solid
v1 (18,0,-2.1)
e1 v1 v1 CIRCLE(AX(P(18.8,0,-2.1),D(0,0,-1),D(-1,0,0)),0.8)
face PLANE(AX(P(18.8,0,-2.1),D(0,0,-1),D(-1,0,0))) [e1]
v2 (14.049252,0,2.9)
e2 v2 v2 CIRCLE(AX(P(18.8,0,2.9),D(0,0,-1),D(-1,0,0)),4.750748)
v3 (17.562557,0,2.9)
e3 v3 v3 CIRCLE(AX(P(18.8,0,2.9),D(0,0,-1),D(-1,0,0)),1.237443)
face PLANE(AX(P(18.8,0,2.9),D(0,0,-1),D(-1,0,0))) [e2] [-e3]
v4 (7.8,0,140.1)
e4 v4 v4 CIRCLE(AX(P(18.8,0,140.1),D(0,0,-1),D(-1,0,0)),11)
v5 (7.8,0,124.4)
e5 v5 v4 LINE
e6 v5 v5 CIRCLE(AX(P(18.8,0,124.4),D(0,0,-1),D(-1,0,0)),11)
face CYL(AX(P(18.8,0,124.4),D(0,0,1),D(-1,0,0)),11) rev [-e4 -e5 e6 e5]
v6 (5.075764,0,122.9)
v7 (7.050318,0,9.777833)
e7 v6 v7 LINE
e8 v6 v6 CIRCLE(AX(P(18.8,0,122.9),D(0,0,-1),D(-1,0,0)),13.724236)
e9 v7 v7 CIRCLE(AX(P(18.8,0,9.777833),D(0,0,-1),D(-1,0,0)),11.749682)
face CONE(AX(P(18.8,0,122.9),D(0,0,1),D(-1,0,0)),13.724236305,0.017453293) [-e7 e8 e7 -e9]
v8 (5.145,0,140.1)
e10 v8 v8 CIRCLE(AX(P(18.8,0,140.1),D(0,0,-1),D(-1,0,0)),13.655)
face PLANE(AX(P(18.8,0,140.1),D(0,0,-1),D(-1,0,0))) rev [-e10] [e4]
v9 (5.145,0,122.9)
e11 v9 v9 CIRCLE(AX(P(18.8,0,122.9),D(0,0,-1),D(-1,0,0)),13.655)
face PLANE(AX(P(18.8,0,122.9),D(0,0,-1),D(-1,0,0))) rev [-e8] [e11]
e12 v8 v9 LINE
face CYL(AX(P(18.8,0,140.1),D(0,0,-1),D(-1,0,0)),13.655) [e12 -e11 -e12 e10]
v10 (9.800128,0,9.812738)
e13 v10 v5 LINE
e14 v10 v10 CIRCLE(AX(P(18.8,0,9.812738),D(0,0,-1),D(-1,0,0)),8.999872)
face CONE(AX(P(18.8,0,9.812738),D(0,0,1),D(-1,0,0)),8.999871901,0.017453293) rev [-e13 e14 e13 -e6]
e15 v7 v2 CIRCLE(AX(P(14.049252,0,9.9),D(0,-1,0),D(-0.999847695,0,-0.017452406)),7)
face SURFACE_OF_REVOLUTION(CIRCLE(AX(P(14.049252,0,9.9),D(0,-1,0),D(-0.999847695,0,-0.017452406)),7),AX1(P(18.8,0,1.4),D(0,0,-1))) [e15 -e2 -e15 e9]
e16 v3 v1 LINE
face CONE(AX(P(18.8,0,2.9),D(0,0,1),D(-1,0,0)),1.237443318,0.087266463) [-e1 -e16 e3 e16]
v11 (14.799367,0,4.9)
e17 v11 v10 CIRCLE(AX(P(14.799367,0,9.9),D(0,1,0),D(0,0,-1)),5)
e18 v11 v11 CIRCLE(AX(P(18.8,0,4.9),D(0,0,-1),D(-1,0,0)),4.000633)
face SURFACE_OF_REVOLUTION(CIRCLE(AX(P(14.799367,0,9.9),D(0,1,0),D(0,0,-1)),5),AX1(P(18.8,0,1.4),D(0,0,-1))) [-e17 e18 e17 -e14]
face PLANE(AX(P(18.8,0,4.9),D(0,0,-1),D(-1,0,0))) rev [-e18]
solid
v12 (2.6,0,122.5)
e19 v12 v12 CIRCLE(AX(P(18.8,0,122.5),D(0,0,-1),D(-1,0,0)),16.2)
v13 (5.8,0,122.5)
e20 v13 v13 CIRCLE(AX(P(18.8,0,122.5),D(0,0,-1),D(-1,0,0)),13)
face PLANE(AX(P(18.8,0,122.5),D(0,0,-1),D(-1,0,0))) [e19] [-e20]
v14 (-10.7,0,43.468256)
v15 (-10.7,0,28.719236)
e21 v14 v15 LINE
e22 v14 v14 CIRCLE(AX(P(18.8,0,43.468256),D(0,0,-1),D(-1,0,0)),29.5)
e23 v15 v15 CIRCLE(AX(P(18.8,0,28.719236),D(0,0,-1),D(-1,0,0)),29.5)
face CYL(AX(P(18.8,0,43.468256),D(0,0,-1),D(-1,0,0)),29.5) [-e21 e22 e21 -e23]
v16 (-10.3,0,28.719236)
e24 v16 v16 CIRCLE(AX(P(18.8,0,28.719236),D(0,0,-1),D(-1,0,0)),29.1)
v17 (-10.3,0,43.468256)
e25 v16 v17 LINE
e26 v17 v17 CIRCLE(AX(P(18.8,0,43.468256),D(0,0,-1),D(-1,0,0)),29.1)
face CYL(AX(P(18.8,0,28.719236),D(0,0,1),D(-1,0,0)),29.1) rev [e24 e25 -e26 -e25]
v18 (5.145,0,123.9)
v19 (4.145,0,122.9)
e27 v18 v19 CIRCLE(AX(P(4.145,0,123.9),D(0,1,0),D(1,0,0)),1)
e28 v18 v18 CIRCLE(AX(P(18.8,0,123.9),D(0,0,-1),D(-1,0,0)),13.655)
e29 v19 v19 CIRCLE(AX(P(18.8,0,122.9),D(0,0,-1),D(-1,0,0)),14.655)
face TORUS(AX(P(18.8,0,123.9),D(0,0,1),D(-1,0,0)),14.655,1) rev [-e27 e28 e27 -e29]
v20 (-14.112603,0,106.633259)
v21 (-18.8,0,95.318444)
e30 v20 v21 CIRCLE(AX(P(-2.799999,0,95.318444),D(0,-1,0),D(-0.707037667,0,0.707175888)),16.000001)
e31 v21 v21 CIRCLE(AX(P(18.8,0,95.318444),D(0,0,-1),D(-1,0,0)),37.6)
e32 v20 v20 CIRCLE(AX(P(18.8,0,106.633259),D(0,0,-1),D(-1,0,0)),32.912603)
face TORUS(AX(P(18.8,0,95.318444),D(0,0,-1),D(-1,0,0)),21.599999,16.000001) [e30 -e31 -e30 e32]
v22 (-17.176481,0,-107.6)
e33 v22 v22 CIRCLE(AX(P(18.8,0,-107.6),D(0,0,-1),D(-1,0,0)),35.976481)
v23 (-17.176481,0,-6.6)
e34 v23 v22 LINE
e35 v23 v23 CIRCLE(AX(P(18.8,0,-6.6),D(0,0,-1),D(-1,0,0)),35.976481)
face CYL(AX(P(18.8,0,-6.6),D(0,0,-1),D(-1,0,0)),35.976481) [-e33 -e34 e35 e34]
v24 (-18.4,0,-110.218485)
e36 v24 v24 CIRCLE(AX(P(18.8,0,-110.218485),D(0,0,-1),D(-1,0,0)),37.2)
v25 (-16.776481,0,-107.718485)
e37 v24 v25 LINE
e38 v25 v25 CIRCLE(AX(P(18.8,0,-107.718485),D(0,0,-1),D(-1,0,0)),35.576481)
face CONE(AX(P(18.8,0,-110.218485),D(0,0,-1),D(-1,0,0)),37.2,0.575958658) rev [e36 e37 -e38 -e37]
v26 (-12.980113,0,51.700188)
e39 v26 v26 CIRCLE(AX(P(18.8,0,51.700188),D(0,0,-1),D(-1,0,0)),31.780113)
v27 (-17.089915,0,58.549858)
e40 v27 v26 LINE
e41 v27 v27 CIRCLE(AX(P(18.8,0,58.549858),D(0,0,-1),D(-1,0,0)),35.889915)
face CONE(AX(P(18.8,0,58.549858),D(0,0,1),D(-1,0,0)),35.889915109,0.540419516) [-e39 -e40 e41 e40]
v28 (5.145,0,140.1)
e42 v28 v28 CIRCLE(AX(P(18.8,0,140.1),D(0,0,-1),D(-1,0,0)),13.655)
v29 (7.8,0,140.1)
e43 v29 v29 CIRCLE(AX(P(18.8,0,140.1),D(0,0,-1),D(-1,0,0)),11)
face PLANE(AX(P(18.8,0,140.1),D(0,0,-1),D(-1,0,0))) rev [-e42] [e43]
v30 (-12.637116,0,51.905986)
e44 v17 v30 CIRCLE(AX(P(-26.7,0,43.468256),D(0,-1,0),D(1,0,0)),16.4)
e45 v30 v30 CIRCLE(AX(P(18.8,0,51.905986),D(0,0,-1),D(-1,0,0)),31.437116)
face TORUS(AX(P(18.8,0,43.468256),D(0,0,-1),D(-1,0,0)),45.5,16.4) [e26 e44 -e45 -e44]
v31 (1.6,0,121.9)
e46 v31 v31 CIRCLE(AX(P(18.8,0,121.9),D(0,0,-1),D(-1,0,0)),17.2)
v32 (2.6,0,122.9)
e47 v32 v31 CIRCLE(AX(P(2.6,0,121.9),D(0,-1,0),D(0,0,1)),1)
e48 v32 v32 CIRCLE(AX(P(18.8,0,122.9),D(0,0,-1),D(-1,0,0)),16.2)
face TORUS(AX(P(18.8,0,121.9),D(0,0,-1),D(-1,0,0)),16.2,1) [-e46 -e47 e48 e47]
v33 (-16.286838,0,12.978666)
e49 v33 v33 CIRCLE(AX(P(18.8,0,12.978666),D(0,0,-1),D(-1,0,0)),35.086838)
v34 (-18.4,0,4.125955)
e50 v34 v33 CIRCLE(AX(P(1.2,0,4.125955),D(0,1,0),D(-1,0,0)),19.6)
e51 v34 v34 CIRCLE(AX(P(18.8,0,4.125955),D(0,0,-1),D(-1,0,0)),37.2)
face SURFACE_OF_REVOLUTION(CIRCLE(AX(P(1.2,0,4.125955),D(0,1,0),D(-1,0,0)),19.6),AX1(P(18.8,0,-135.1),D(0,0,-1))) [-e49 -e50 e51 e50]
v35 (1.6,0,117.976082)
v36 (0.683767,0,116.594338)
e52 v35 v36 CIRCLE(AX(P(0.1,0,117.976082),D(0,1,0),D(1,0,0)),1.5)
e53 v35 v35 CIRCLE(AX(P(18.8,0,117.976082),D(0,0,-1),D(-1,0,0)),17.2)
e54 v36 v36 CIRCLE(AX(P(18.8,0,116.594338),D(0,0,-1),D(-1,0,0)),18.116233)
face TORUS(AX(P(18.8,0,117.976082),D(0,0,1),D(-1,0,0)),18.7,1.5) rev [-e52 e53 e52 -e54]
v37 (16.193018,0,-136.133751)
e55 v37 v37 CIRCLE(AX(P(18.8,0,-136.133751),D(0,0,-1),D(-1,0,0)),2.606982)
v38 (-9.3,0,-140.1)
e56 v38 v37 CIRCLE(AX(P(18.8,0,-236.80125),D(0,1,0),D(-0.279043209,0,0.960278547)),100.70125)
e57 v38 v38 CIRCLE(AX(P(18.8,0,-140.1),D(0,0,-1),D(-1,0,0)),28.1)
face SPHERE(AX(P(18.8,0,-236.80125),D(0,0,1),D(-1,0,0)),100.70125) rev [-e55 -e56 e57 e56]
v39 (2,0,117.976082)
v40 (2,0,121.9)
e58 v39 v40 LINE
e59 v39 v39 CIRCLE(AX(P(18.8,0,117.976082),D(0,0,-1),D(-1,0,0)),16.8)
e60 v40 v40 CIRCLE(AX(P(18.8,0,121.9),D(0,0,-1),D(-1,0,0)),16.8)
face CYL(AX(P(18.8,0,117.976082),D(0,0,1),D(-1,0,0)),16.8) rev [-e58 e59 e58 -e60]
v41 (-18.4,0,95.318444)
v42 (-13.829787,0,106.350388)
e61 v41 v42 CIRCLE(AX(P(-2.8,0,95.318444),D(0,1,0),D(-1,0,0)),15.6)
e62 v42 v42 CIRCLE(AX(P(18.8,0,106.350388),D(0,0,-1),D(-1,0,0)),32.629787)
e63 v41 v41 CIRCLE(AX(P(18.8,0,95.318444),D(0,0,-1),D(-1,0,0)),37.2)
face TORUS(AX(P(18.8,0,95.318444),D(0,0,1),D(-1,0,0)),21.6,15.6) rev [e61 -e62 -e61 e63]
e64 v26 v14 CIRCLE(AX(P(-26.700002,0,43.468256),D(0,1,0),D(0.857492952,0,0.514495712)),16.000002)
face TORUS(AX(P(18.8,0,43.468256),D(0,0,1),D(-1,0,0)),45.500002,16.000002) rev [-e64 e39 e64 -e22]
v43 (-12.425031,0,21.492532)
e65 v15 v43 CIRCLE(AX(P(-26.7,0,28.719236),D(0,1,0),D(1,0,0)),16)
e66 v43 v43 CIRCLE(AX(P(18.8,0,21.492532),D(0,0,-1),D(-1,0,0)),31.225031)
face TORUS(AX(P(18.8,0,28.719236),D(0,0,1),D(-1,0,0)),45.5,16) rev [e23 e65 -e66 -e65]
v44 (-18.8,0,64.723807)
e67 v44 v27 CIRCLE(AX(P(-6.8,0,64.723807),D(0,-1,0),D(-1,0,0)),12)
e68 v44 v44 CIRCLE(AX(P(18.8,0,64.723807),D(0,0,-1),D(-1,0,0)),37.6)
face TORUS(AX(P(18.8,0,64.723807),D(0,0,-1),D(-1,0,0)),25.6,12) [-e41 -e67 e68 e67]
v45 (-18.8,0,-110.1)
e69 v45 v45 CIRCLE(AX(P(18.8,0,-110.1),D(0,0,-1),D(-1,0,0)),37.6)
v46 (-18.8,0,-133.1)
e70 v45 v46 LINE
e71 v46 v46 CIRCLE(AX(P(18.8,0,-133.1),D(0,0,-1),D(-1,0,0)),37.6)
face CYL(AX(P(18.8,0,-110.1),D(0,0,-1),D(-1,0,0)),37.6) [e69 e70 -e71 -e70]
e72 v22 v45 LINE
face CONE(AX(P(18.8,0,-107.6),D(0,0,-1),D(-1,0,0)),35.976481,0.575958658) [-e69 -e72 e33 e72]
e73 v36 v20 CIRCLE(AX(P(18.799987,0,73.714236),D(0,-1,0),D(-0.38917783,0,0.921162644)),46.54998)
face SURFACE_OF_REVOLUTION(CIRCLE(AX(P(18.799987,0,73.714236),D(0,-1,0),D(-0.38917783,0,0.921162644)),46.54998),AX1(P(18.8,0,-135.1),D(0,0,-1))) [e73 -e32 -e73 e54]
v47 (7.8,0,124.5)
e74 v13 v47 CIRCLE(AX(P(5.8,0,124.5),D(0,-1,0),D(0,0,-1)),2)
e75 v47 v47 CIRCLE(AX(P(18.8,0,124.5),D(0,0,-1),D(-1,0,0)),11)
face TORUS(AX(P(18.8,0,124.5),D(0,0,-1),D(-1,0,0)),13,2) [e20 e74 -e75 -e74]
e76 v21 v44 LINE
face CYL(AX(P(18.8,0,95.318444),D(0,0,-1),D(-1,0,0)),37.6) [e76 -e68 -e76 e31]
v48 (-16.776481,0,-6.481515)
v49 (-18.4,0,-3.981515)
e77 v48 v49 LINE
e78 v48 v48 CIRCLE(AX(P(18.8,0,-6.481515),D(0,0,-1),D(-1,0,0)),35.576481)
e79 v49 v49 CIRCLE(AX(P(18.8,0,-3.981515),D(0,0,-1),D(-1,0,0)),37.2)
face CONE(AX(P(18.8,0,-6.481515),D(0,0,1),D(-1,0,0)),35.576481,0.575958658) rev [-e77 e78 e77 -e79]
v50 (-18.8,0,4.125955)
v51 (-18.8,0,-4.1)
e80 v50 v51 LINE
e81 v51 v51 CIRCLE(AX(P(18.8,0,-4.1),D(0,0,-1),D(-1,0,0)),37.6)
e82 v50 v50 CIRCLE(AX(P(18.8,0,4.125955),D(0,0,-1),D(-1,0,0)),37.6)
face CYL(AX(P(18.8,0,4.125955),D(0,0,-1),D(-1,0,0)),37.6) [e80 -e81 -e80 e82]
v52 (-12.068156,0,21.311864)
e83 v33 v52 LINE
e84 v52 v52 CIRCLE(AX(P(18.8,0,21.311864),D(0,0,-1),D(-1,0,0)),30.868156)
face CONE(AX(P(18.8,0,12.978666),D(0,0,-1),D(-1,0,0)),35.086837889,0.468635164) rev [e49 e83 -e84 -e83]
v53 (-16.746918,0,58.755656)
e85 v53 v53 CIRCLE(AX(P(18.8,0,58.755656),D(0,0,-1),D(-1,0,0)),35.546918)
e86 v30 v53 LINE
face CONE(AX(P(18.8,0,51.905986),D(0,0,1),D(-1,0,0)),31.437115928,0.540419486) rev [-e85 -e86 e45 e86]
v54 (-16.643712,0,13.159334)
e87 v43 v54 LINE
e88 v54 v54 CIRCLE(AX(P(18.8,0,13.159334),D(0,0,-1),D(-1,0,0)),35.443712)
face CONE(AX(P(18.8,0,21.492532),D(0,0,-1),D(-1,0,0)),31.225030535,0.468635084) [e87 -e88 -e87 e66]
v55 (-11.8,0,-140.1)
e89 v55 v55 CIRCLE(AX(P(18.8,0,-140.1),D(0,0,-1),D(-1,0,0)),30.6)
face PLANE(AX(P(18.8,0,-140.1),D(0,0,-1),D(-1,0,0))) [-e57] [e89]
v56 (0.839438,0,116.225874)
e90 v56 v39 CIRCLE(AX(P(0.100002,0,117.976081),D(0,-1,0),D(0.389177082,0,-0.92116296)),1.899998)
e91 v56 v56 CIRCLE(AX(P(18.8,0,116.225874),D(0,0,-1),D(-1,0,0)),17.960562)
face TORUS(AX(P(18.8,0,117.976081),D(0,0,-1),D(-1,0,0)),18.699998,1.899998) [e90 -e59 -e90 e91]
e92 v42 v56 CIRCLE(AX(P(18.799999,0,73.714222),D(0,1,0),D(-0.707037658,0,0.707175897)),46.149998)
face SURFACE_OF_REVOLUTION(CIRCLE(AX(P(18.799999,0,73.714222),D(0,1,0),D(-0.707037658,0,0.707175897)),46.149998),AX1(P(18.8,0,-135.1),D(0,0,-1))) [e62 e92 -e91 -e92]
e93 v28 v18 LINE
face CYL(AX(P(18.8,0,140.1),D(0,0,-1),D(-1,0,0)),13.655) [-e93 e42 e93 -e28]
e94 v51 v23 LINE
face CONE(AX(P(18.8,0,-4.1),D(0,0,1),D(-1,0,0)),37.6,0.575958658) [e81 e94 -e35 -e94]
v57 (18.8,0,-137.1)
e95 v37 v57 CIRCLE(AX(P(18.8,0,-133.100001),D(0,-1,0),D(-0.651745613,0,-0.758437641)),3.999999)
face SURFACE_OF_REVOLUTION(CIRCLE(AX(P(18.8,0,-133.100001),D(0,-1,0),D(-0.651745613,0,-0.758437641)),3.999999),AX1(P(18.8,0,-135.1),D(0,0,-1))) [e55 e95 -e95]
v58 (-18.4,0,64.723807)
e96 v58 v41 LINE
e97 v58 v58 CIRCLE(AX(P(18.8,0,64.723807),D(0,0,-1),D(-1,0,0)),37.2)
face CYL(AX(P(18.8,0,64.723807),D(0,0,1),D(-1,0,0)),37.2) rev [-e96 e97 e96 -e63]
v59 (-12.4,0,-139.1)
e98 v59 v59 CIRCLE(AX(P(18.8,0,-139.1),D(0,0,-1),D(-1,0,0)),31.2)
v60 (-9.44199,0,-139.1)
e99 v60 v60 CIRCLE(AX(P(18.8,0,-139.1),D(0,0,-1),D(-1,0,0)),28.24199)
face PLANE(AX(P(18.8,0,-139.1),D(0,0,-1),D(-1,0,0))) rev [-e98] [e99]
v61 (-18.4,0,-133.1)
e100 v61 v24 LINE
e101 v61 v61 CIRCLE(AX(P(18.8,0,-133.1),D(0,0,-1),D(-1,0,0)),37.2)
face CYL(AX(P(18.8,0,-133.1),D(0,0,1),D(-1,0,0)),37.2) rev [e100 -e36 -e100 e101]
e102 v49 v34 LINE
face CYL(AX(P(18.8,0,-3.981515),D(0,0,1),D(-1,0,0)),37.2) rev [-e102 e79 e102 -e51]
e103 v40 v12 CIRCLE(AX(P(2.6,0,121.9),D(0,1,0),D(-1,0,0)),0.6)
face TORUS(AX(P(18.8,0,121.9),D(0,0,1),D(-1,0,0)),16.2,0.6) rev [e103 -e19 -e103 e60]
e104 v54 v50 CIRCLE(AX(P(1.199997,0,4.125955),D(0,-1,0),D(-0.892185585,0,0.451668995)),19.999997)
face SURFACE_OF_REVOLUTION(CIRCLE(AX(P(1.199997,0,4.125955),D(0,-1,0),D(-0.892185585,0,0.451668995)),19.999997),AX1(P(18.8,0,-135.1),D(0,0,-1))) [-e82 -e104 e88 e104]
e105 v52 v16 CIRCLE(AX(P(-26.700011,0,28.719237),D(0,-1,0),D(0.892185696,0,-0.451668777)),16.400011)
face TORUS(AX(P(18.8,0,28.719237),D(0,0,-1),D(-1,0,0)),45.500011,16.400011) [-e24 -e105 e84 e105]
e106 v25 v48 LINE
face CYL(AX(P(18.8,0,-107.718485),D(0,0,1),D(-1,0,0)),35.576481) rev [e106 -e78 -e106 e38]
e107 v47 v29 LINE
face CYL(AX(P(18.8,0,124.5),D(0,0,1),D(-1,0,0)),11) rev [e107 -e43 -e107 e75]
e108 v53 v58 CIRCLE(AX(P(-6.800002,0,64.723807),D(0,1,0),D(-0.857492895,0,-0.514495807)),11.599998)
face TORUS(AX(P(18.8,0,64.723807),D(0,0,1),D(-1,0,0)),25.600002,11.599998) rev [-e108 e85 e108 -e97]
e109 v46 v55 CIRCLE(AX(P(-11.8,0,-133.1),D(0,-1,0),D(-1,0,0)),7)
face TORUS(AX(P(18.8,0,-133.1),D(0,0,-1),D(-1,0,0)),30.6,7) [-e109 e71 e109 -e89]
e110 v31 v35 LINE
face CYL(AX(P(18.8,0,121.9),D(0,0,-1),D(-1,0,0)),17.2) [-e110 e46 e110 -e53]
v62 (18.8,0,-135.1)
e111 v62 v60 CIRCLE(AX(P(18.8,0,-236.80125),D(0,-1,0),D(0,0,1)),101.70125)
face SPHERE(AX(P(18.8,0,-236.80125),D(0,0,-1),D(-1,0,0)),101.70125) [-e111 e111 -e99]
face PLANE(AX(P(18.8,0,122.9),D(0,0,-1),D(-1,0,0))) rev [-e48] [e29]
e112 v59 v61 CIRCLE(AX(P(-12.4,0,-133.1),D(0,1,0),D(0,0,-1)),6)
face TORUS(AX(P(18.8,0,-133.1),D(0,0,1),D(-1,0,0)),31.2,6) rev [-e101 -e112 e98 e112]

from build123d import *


# Not quite as in the source:
# - ends of sketch curves that miss each other by under 0.0002 mm in the source are joined


with BuildPart() as f3:
    # F2 (on Front) → F3 (revolve)
    with BuildSketch(Plane.XZ):
        with BuildLine():
            Line((7.8, 124.5), (7.8, 140.1))
            Line((7.8, 140.1), (5.145, 140.1))
            Line((5.145, 140.1), (5.145, 123.9))
            ThreePointArc((5.145, 123.9), (4.8521067812, 123.1928932188), (4.145, 122.9))
            Line((4.145, 122.9), (2.6, 122.9))
            ThreePointArc((2.6, 122.9), (1.8928932188, 122.6071067812), (1.6, 121.9))
            Line((1.6, 121.9), (1.6, 117.976082))
            ThreePointArc((1.6, 117.976082), (1.350130078, 117.1471219357), (0.6837669492, 116.5943381203))
            ThreePointArc((0.6837669492, 116.5943381203), (-7.1959862725, 112.3291290083), (-14.1126025069, 106.633258507))
            ThreePointArc((-14.1126025069, 106.633258507), (-17.5817732211, 101.4421014399), (-18.8, 95.318444))
            Line((-18.8, 95.318444), (-18.8, 64.723807))
            ThreePointArc((-18.8, 64.723807), (-18.3645791385, 61.5206040173), (-17.0899151086, 58.5498579349))
            Line((-17.0899151086, 58.5498579349), (-12.980113, 51.700188))
            ThreePointArc((-12.980113, 51.700188), (-11.2805611257, 47.7391932277), (-10.7, 43.468256))
            Line((-10.7, 43.468256), (-10.7, 28.719236))
            ThreePointArc((-10.7, 28.719236), (-11.1372317464, 25.0043679965), (-12.4250305354, 21.4925322711))
            Line((-12.4250305354, 21.4925322711), (-16.643712, 13.159334))
            ThreePointArc((-16.643712, 13.159334), (-18.2534603944, 8.7695396803), (-18.8, 4.125955))
            Line((-18.8, 4.125955), (-18.8, -4.1))
            Line((-18.8, -4.1), (-17.176481, -6.6))
            Line((-17.176481, -6.6), (-17.176481, -107.6))
            Line((-17.176481, -107.6), (-18.8, -110.1))
            Line((-18.8, -110.1), (-18.8, -133.1))
            ThreePointArc((-18.8, -133.1), (-16.7497474683, -138.0497474683), (-11.8, -140.1))
            Line((-11.8, -140.1), (-9.3, -140.1))
            ThreePointArc((-9.3, -140.1), (3.3189642091, -137.297082839), (16.1930179947, -136.133750794))
            ThreePointArc((16.1930179947, -136.133750794), (17.4098568229, -136.850666867), (18.8, -137.1))
            Line((18.8, -137.1), (18.8, -135.1))
            ThreePointArc((18.8, -135.1), (4.538075165, -136.1049653041), (-9.4419900149, -139.1))
            Line((-9.4419900149, -139.1), (-12.4, -139.1))
            ThreePointArc((-12.4, -139.1), (-16.6426406871, -137.3426406871), (-18.4, -133.1))
            Line((-18.4, -133.1), (-18.4, -110.218485399))
            Line((-18.4, -110.218485399), (-16.776481, -107.718485399))
            Line((-16.776481, -107.718485399), (-16.776481, -6.481514601))
            Line((-16.776481, -6.481514601), (-18.4, -3.981514601))
            Line((-18.4, -3.981514601), (-18.4, 4.125955))
            ThreePointArc((-18.4, 4.125955), (-17.8643911865, 8.6766679867), (-16.286837889, 12.9786664853))
            Line((-16.286837889, 12.9786664853), (-12.0681557678, 21.311864398))
            ThreePointArc((-12.0681557678, 21.311864398), (-10.74816254, 24.9114962964), (-10.3, 28.719236))
            Line((-10.3, 28.719236), (-10.3, 43.468256))
            ThreePointArc((-10.3, 43.468256), (-10.8950751539, 47.8459666584), (-12.6371159279, 51.9059862383))
            Line((-12.6371159279, 51.9059862383), (-16.7469178297, 58.7556563022))
            ThreePointArc((-16.7469178297, 58.7556563022), (-17.9790931672, 61.62737745), (-18.4, 64.723807))
            Line((-18.4, 64.723807), (-18.4, 95.318444))
            ThreePointArc((-18.4, 95.318444), (-17.2122288905, 101.2890100039), (-13.8297873838, 106.3503880838))
            ThreePointArc((-13.8297873838, 106.3503880838), (-6.9726050801, 111.9973145378), (0.8394378344, 116.2258737751))
            ThreePointArc((0.8394378344, 116.2258737751), (1.6834980988, 116.9260659186), (2, 117.976082))
            Line((2, 117.976082), (2, 121.9))
            ThreePointArc((2, 121.9), (2.1757359313, 122.3242640687), (2.6, 122.5))
            Line((2.6, 122.5), (5.8, 122.5))
            ThreePointArc((5.8, 122.5), (7.2142135624, 123.0857864376), (7.8, 124.5))
        make_face()
    revolve(axis=Axis((18.8, 0, -135.1), (0, 0, -1)))


with BuildPart() as f6:
    # F5 (on Front) → F6 (revolve)
    with BuildSketch(Plane.XZ):
        with BuildLine():
            Line((7.8, 124.4), (7.8, 140.1))
            Line((7.8, 140.1), (5.145, 140.1))
            Line((5.145, 140.1), (5.145, 122.9))
            Line((5.145, 122.9), (5.0757636953, 122.9))
            Line((5.0757636953, 122.9), (7.0503184624, 9.7778331549))
            ThreePointArc((7.0503184624, 9.7778331549), (9.1428874784, 4.9072468559), (14.0492523285, 2.9))
            Line((14.0492523285, 2.9), (17.5625566824, 2.9))
            Line((17.5625566824, 2.9), (18, -2.1))
            Line((18, -2.1), (18.8, -2.1))
            Line((18.8, -2.1), (18.8, 4.9))
            Line((18.8, 4.9), (14.7993665745, 4.9))
            ThreePointArc((14.7993665745, 4.9), (11.294820253, 6.3337477542), (9.8001280987, 9.8127379678))
            Line((9.8001280987, 9.8127379678), (7.8, 124.4))
        make_face()
    revolve(axis=Axis((18.8, 0, 1.4), (0, 0, -1)))


solid = Compound([f3.part, f6.part])
